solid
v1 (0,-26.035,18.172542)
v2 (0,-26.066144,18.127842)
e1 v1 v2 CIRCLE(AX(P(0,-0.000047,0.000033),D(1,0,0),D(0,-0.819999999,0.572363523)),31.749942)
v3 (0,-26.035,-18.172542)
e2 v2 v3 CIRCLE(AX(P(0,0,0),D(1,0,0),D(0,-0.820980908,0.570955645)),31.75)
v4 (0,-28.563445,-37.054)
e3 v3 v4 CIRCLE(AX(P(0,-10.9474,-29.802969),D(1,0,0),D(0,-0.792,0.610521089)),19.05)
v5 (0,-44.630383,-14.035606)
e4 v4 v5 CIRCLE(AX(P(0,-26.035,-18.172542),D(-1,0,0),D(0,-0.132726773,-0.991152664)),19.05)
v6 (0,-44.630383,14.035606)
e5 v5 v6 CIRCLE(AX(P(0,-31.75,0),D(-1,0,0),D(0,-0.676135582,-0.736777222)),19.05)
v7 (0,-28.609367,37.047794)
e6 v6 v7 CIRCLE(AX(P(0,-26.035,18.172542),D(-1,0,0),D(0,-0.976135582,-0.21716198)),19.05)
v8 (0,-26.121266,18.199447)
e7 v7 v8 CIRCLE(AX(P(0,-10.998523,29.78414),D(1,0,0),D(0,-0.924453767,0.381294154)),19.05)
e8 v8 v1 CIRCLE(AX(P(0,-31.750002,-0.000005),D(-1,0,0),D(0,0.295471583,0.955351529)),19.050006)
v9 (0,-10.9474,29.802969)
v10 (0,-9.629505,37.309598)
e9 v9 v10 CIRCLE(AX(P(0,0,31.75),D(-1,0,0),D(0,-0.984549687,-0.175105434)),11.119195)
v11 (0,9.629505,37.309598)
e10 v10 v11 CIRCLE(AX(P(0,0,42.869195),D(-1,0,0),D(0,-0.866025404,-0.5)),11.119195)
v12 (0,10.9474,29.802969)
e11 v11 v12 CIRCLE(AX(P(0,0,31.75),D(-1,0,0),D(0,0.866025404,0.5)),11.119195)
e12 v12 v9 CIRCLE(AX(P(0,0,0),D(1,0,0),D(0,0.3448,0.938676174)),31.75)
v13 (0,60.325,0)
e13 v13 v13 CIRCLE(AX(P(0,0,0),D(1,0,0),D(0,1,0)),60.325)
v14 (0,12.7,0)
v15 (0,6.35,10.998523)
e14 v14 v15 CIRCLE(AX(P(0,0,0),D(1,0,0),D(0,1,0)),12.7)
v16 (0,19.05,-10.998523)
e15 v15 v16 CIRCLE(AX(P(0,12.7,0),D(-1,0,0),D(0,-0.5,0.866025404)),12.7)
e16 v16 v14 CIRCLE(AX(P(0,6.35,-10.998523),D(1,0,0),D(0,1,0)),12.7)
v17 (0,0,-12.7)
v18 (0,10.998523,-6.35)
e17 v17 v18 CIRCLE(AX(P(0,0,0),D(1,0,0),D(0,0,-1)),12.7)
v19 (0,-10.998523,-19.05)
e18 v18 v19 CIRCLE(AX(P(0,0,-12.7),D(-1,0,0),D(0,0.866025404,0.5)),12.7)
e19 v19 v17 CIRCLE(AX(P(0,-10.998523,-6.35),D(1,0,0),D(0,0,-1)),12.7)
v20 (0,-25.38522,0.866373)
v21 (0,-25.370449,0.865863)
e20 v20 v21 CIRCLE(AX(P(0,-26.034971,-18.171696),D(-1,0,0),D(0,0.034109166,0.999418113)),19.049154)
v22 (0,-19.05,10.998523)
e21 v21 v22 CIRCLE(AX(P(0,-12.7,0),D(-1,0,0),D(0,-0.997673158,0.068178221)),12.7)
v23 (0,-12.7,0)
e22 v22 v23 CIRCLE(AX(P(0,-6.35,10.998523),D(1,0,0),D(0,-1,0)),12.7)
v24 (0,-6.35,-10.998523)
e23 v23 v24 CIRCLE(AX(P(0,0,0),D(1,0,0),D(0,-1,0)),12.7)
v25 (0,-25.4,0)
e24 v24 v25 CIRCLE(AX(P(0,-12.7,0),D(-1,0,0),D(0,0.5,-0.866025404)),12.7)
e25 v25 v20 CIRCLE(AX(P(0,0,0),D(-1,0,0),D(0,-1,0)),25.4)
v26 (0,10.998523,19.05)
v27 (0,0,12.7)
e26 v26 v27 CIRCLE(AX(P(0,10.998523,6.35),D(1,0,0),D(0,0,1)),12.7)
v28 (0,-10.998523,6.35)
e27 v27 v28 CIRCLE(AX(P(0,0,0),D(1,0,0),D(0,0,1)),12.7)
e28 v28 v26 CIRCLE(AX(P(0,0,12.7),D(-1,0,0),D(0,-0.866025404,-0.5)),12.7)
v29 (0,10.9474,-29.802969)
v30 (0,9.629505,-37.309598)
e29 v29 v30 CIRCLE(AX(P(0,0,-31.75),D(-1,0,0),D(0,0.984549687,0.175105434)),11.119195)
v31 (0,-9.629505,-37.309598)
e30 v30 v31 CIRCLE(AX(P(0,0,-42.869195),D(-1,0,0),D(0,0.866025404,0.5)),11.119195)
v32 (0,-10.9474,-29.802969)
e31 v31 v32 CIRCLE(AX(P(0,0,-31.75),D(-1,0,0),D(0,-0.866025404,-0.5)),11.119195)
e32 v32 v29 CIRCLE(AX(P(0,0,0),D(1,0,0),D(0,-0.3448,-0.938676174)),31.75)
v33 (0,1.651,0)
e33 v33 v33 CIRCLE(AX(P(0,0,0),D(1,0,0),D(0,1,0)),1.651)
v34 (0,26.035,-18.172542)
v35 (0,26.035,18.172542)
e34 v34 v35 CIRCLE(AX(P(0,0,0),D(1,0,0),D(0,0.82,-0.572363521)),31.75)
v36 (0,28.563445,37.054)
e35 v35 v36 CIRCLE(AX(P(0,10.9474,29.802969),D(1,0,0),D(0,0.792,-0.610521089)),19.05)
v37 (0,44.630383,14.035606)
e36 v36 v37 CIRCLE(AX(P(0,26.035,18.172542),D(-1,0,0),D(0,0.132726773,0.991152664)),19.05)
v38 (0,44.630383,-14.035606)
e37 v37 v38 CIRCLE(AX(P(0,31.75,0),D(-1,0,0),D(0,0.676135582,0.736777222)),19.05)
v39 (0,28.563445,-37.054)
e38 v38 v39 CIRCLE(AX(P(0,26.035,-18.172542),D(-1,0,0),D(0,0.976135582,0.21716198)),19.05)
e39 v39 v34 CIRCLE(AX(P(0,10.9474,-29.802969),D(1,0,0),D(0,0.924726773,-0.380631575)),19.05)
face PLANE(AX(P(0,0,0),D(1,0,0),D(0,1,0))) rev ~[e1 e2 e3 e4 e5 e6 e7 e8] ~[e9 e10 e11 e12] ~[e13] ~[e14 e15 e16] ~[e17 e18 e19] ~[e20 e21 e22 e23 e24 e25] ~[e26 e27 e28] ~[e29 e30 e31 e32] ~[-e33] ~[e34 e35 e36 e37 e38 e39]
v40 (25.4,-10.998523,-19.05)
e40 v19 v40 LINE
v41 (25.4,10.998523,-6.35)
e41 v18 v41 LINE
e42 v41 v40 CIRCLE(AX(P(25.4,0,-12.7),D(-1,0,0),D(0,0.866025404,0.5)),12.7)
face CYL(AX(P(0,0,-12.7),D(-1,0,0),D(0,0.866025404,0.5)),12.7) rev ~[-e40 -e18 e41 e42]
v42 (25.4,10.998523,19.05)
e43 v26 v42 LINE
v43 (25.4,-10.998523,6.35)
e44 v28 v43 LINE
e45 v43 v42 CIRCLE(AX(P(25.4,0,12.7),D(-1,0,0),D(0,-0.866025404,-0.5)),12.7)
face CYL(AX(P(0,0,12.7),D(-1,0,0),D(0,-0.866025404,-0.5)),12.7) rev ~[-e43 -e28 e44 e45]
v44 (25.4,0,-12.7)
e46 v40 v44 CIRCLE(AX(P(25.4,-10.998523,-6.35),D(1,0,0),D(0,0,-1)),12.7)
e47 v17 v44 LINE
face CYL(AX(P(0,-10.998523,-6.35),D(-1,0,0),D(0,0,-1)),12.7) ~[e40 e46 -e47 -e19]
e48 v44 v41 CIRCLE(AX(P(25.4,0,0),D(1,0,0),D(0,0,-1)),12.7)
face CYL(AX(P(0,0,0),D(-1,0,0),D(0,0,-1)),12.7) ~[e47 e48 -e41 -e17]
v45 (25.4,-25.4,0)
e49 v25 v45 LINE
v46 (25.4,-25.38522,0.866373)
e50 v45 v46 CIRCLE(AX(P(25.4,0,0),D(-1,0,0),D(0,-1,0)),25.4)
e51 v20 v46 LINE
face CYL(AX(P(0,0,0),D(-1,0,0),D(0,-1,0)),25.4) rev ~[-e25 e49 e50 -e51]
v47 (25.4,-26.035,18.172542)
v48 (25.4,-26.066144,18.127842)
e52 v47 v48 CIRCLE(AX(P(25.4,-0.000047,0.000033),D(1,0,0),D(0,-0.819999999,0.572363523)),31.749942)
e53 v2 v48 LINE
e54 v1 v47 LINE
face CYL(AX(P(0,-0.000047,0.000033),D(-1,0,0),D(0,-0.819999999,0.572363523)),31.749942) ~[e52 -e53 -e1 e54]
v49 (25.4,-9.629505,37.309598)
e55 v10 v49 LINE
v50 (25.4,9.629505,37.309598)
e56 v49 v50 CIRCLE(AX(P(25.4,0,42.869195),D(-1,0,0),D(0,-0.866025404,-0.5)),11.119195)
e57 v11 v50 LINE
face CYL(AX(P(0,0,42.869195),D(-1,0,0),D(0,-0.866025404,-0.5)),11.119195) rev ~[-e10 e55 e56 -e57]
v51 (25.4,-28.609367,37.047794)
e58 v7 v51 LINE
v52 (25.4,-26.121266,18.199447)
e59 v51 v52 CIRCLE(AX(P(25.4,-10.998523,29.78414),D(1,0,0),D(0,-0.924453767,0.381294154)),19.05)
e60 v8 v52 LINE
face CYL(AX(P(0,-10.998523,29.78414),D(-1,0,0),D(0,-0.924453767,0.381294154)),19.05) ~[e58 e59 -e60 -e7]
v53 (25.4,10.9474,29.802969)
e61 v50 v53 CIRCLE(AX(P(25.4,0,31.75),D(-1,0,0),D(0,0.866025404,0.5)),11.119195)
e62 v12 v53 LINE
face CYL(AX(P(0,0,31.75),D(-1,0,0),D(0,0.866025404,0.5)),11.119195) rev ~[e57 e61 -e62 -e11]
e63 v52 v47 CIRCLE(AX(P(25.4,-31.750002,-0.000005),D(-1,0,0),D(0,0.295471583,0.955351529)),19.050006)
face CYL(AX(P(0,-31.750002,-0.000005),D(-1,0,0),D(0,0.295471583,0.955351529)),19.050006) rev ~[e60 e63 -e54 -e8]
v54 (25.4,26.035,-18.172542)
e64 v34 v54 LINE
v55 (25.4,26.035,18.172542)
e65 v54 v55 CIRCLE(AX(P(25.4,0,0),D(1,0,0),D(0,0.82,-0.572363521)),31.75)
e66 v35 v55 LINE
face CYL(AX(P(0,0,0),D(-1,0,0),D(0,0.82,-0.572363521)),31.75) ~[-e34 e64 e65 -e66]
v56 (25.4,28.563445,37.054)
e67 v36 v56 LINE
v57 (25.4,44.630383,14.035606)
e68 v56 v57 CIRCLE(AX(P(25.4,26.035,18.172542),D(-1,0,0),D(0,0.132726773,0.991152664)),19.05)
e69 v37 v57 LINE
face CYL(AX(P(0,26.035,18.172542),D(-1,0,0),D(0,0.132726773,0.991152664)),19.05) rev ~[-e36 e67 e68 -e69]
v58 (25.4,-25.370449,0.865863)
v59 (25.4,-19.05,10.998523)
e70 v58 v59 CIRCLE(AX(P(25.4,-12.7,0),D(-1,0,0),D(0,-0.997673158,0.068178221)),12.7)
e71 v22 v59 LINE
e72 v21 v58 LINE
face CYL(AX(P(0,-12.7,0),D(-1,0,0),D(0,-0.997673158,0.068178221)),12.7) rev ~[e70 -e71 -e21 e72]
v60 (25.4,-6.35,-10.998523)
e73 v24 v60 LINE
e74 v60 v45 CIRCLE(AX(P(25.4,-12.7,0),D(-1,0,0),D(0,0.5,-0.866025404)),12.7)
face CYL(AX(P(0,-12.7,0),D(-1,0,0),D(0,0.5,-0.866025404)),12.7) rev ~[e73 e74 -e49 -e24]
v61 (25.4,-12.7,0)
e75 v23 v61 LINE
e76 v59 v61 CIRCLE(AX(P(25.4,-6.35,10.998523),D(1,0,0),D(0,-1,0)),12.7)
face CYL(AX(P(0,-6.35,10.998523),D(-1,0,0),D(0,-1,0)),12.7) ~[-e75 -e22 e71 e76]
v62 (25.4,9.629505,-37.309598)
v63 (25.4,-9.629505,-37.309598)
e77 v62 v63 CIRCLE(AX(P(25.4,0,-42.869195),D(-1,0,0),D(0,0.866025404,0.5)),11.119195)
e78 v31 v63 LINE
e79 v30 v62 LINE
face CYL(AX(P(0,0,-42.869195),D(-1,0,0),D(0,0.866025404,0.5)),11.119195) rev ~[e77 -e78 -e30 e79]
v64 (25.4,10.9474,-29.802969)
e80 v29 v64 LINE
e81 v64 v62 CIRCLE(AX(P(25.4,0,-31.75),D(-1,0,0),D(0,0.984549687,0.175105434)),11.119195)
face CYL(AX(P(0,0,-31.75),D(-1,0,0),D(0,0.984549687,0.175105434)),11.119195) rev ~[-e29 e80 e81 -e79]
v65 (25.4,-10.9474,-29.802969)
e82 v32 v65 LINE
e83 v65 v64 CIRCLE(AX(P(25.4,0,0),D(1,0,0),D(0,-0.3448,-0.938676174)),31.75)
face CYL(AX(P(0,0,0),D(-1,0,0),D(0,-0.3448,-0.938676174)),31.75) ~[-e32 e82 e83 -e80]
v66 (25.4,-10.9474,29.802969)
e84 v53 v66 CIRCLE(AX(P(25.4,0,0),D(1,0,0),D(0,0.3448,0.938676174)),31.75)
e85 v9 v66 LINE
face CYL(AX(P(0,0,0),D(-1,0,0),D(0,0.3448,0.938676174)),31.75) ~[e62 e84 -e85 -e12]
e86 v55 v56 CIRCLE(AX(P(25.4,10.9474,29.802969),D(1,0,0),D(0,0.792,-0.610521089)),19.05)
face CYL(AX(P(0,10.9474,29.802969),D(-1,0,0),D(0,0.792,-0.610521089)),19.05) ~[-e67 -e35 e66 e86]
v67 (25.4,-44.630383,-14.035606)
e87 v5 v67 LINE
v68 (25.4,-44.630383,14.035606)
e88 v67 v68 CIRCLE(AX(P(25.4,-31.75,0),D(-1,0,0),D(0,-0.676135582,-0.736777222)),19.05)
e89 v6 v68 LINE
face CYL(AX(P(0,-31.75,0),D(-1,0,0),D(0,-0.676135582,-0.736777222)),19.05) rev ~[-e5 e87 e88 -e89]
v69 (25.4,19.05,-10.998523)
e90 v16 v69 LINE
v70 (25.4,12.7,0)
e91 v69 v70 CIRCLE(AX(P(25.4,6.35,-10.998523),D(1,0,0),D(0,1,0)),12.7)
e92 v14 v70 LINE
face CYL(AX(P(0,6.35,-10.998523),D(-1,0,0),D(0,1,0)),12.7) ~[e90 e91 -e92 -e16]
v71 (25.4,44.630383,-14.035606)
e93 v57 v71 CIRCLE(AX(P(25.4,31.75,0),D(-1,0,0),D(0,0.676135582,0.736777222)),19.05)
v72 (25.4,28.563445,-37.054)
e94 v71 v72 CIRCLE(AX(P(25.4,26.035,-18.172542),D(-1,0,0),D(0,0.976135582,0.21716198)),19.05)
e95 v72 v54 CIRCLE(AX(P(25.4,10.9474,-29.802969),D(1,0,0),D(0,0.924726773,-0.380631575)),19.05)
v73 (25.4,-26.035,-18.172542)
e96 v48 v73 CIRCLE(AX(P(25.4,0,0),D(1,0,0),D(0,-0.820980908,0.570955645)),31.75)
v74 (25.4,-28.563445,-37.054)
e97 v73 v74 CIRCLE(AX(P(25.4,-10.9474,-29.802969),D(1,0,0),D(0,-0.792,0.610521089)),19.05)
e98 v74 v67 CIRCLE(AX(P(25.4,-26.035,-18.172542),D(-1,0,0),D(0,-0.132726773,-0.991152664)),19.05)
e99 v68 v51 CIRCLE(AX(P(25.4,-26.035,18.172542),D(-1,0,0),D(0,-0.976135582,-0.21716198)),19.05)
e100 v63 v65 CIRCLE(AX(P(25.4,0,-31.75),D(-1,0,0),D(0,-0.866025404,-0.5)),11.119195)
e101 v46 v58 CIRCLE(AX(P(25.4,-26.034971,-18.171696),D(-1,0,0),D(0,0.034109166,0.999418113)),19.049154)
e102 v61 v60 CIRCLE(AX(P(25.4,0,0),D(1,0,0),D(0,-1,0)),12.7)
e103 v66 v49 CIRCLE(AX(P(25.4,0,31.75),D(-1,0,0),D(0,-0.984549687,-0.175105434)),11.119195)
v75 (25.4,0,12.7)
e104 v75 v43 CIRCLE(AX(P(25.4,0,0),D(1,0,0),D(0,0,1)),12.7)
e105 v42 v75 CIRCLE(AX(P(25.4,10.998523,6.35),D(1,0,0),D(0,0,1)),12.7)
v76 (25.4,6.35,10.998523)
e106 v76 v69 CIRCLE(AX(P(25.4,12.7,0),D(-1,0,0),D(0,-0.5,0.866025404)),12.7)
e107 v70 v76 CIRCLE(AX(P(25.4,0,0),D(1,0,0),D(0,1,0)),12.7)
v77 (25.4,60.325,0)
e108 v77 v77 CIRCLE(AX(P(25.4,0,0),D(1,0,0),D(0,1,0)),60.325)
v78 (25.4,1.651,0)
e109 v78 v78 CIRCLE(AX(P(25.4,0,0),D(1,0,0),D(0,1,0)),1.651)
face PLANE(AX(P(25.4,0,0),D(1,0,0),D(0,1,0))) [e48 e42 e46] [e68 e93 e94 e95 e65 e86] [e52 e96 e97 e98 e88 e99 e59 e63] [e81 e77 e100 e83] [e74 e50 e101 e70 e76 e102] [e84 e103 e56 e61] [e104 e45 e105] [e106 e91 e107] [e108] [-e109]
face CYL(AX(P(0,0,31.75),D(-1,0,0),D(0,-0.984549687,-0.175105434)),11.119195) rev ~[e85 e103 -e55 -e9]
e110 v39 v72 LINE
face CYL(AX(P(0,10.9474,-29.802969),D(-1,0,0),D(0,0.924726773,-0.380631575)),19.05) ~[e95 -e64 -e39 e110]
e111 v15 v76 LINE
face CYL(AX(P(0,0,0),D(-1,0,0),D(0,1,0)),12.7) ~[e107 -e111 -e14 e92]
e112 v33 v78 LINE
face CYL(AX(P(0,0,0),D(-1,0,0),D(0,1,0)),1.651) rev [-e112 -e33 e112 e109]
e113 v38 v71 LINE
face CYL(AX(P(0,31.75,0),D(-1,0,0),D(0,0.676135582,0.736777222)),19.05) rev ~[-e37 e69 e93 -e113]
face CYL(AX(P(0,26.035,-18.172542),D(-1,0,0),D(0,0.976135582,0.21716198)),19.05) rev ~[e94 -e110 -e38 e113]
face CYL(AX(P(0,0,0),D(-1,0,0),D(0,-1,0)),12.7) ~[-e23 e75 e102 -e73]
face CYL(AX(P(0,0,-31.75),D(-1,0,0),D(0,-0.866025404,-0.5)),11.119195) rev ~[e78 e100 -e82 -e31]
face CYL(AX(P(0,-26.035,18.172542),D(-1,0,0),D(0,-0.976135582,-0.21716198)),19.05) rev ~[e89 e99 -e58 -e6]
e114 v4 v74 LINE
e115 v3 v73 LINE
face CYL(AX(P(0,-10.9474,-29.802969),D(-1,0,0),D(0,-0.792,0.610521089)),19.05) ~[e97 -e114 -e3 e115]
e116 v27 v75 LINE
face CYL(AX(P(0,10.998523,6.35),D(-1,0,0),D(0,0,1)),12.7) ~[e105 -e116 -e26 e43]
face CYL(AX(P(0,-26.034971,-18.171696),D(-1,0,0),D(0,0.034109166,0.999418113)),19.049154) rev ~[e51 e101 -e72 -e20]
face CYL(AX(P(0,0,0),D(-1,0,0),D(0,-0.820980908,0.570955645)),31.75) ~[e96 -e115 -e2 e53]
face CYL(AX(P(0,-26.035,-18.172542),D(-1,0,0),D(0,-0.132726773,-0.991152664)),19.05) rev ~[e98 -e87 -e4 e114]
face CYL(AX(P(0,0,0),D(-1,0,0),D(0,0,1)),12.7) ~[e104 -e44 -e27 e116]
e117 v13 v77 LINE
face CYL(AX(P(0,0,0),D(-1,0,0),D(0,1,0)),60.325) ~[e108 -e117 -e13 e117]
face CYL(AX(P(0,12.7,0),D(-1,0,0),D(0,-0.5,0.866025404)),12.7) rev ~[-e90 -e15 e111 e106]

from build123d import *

# Parameters (mm, degrees)
F0_R     = 60.325
F0_R_2   = 1.651
F1_DEPTH = 25.4


# Not quite as in the source:
# - a feature names something its author has since deleted; it is built from what else it names


with BuildPart() as f1:
    # F0 (on Right) → F1 (new body)
    with BuildSketch(Plane.YZ):
        Circle(F0_R)
        with BuildLine():
            ThreePointArc((-44.6303828389, -14.0356060761), (-50.8, 0), (-44.6303828389, 14.0356060761))
            ThreePointArc((-44.6303828389, 14.0356060761), (-41.6692499302, 29.0570596505), (-28.609366898, 37.0477937078))
            ThreePointArc((-28.609366898, 37.0477937078), (-29.8846813864, 27.2910481481), (-26.1212663508, 18.1994466264))
            ThreePointArc((-26.1212663508, 18.1994466264), (-26.0781172223, 18.1860453578), (-26.035, 18.172541787))
            ThreePointArc((-26.035, 18.172541787), (-26.0505815045, 18.1501984364), (-26.0661438338, 18.1278417259))
            ThreePointArc((-26.0661438338, 18.1278417259), (-31.7499883148, -0.0272398323), (-26.035, -18.172541787))
            ThreePointArc((-26.035, -18.172541787), (-29.828858254, -27.2745235138), (-28.5634450169, -37.054000041))
            ThreePointArc((-28.5634450169, -37.054000041), (-41.656, -29.0760668592), (-44.6303828389, -14.0356060761))
        make_face(mode=Mode.SUBTRACT)
        with BuildLine():
            ThreePointArc((-19.05, 10.9985226281), (-17.3485226281, 4.6485226281), (-12.7, 0))
            ThreePointArc((-12.7, 0), (-10.9985226281, -6.35), (-6.35, -10.9985226281))
            ThreePointArc((-6.35, -10.9985226281), (-19.05, -10.9985226281), (-25.4, 0))
            ThreePointArc((-25.4, 0), (-25.3963047456, 0.4332496584), (-25.3852200578, 0.8663732563))
            ThreePointArc((-25.3852200578, 0.8663732563), (-25.3778345329, 0.8661197613), (-25.3704491069, 0.8658634012))
            ThreePointArc((-25.3704491069, 0.8658634012), (-23.4755309293, 6.7214532053), (-19.05, 10.9985226281))
        make_face(mode=Mode.SUBTRACT)
        with BuildLine():
            ThreePointArc((-9.6295053729, -37.3095975192), (-10.9516952283, -33.6727246106), (-10.9474, -29.8029685307))
            ThreePointArc((-10.9474, -29.8029685307), (0, -31.75), (10.9474, -29.8029685307))
            ThreePointArc((10.9474, -29.8029685307), (10.9516952283, -33.6727246106), (9.6295053729, -37.3095975192))
            ThreePointArc((9.6295053729, -37.3095975192), (0, -53.9883900769), (-9.6295053729, -37.3095975192))
        make_face(mode=Mode.SUBTRACT)
        with BuildLine():
            ThreePointArc((10.9985226281, -6.35), (6.35, -23.6985226281), (-10.9985226281, -19.05))
            ThreePointArc((-10.9985226281, -19.05), (-4.6485226281, -17.3485226281), (0, -12.7))
            ThreePointArc((0, -12.7), (6.35, -10.9985226281), (10.9985226281, -6.35))
        make_face(mode=Mode.SUBTRACT)
        with BuildLine():
            ThreePointArc((-10.9985226281, 6.35), (-6.35, 23.6985226281), (10.9985226281, 19.05))
            ThreePointArc((10.9985226281, 19.05), (4.6485226281, 17.3485226281), (0, 12.7))
            ThreePointArc((0, 12.7), (-6.35, 10.9985226281), (-10.9985226281, 6.35))
        make_face(mode=Mode.SUBTRACT)
        Circle(F0_R_2, mode=Mode.SUBTRACT)
        with BuildLine():
            ThreePointArc((6.35, 10.9985226281), (23.6985226281, 6.35), (19.05, -10.9985226281))
            ThreePointArc((19.05, -10.9985226281), (17.3485226281, -4.6485226281), (12.7, 0))
            ThreePointArc((12.7, 0), (10.9985226281, 6.35), (6.35, 10.9985226281))
        make_face(mode=Mode.SUBTRACT)
        with BuildLine():
            ThreePointArc((28.5634450169, -37.054000041), (29.828858254, -27.2745235138), (26.035, -18.172541787))
            ThreePointArc((26.035, -18.172541787), (31.75, 0), (26.035, 18.172541787))
            ThreePointArc((26.035, 18.172541787), (29.828858254, 27.2745235138), (28.5634450169, 37.054000041))
            ThreePointArc((28.5634450169, 37.054000041), (41.656, 29.0760668592), (44.6303828389, 14.0356060761))
            ThreePointArc((44.6303828389, 14.0356060761), (50.8, 0), (44.6303828389, -14.0356060761))
            ThreePointArc((44.6303828389, -14.0356060761), (41.656, -29.0760668592), (28.5634450169, -37.054000041))
        make_face(mode=Mode.SUBTRACT)
        with BuildLine():
            ThreePointArc((9.6295053729, 37.3095975192), (10.9516952283, 33.6727246106), (10.9474, 29.8029685307))
            ThreePointArc((10.9474, 29.8029685307), (0, 31.75), (-10.9474, 29.8029685307))
            ThreePointArc((-10.9474, 29.8029685307), (-10.9516952283, 33.6727246106), (-9.6295053729, 37.3095975192))
            ThreePointArc((-9.6295053729, 37.3095975192), (0, 53.9883900769), (9.6295053729, 37.3095975192))
        make_face(mode=Mode.SUBTRACT)
    extrude(amount=F1_DEPTH)


solid = f1.part
